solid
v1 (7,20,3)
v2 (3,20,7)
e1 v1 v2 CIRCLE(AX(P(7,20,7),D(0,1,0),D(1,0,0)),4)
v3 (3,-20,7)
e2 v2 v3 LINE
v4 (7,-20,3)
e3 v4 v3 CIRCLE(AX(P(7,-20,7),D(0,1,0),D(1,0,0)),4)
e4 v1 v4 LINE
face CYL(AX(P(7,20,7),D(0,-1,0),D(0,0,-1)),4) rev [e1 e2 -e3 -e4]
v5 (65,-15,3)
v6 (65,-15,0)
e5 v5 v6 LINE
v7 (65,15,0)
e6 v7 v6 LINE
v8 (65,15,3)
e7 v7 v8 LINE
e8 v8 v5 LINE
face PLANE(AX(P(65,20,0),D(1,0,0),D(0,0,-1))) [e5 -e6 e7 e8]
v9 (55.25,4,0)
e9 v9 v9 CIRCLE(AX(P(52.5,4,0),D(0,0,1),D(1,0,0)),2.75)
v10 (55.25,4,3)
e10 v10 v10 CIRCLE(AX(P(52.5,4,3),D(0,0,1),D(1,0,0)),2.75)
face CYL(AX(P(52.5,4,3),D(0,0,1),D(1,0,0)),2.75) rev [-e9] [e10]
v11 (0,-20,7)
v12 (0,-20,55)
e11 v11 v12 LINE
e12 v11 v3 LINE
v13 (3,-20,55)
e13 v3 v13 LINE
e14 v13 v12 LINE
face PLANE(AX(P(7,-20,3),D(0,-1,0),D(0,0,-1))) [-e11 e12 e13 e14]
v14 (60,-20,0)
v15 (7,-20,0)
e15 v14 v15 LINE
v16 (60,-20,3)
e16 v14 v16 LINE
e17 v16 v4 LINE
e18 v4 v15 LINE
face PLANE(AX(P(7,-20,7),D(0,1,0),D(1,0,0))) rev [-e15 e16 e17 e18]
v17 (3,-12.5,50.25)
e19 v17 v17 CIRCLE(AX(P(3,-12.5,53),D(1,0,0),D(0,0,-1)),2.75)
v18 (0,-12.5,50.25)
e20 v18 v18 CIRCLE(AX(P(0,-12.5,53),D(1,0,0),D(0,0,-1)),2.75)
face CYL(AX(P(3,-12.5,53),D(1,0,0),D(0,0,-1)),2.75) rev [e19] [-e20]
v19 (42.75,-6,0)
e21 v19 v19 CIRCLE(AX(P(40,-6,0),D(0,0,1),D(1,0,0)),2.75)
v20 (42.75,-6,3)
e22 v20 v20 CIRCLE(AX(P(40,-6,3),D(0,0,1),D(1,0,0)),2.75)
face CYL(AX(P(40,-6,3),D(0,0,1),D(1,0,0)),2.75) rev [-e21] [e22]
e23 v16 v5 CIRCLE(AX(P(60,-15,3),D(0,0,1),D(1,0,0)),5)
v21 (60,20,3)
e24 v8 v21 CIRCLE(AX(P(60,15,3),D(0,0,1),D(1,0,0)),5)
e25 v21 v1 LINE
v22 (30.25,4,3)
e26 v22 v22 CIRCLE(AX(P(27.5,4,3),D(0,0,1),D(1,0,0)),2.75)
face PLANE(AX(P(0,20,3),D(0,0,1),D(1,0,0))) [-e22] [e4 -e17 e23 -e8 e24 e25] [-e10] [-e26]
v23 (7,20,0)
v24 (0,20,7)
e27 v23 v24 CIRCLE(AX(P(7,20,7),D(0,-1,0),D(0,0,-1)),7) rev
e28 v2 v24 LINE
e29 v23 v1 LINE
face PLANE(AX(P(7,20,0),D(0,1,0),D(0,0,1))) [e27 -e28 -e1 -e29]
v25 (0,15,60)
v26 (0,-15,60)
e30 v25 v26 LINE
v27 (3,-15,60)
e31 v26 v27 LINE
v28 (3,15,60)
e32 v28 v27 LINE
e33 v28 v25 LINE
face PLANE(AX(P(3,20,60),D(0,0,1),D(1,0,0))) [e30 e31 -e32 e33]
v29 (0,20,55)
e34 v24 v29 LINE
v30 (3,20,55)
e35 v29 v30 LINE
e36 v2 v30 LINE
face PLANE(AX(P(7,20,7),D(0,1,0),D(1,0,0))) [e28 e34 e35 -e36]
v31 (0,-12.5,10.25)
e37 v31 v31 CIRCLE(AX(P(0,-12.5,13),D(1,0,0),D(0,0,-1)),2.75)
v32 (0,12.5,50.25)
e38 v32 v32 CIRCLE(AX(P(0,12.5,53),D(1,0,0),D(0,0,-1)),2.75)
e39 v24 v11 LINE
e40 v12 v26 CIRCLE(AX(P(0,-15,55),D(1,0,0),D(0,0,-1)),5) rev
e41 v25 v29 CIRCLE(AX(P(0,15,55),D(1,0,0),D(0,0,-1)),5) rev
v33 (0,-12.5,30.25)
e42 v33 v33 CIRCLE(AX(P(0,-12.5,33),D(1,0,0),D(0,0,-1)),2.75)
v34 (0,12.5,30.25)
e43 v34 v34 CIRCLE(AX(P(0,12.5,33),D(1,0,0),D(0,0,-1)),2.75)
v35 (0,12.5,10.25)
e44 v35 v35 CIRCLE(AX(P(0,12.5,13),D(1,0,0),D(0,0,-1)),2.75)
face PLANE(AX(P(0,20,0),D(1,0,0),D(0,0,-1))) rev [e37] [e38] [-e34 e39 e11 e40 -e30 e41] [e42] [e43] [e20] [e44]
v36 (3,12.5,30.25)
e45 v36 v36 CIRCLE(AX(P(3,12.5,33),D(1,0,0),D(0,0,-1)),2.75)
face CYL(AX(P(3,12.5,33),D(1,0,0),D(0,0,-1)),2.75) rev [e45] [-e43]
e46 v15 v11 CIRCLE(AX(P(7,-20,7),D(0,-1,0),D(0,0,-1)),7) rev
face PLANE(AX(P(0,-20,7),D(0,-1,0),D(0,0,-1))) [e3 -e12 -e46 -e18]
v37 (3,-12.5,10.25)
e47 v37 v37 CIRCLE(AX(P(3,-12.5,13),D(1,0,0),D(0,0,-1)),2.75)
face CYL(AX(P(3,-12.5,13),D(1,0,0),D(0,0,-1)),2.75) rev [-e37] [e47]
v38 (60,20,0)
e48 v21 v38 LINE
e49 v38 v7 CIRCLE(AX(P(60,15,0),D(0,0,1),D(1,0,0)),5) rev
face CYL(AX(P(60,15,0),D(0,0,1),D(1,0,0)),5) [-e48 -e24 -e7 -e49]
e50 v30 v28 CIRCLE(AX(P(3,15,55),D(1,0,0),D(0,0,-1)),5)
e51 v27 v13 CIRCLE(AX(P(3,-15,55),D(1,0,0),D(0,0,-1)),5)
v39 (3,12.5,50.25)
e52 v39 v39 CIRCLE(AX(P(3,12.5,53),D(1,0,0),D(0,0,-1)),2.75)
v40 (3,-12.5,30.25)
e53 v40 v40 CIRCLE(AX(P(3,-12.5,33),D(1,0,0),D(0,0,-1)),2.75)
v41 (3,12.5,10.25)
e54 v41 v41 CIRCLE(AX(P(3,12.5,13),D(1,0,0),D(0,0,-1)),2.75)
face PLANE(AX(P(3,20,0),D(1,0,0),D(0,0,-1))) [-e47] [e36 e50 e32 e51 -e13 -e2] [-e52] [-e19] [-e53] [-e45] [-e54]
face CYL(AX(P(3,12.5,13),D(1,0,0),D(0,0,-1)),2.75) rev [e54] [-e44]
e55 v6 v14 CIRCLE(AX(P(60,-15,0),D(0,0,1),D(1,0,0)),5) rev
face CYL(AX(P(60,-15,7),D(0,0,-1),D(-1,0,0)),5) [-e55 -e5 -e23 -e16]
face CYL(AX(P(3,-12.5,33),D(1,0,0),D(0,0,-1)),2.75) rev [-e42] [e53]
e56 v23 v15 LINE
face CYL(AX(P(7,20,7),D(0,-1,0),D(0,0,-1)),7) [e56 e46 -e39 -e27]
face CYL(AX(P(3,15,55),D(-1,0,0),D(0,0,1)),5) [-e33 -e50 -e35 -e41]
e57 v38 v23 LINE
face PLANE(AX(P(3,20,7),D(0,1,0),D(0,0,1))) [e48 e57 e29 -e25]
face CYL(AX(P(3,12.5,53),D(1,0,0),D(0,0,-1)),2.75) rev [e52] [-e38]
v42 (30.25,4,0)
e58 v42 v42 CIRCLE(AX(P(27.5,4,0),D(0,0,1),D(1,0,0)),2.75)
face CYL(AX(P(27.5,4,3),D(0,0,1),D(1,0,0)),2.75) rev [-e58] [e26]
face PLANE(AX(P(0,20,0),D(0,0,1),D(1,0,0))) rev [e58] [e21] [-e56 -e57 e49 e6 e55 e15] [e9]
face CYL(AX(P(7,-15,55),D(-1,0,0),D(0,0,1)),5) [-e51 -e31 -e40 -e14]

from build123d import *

# Parameters (mm, degrees)
ODGI_CIE_BAZOWE1_DEPTH = 20
OTW_R_POD_RUB_M51_D    = 5.5
OTW_R_POD_RUB_M52_D    = 5.5
ZAOKR_GLENIE1_R        = 5


# Sheet-metal steps are written as plain solids
with BuildPart() as part:
    # Szkic1 → Odgięcie bazowe1 (new, symmetric)
    with BuildSketch(Plane(origin=(0, 0, 0), x_dir=(1, 0, 0), z_dir=(0, 1, 0))):
        with BuildLine():
            Line((0, -60), (0, -7))
            ThreePointArc((0, -7), (2.050252532, -2.050252532), (7, 0))
            Line((7, 0), (65, 0))
            Line((65, 0), (65, -3))
            Line((65, -3), (7, -3))
            ThreePointArc((7, -3), (4.171572875, -4.171572875), (3, -7))
            Line((3, -7), (3, -60))
            Line((3, -60), (0, -60))
        make_face()
    extrude(amount=ODGI_CIE_BAZOWE1_DEPTH, both=True)

    # Otwór pod śrubę M51 (through all)
    with Locations(Plane.XY.offset(3)):
        with Locations((27.5, 4), (40, -6), (52.5, 4)):
            Hole(OTW_R_POD_RUB_M51_D / 2)

    # Otwór pod śrubę M52 (through all)
    with Locations(Plane(origin=(3, 0, 0), x_dir=(0, 0, -1), z_dir=(1, 0, 0))):
        with Locations((-53, 12.5), (-33, 12.5), (-13, 12.5), (-13, -12.5), (-33, -12.5), (-53, -12.5)):
            Hole(OTW_R_POD_RUB_M52_D / 2)

    # Zaokrąglenie1
    zaokr_glenie1_edges = [part.edges().sort_by_distance(p)[0] for p in [
        (65, 20, 1.5),
        (65, -20, 1.5),
        (1.5, 20, 60),
        (1.5, -20, 60),
    ]]
    fillet(zaokr_glenie1_edges, radius=ZAOKR_GLENIE1_R)


solid = part.part
